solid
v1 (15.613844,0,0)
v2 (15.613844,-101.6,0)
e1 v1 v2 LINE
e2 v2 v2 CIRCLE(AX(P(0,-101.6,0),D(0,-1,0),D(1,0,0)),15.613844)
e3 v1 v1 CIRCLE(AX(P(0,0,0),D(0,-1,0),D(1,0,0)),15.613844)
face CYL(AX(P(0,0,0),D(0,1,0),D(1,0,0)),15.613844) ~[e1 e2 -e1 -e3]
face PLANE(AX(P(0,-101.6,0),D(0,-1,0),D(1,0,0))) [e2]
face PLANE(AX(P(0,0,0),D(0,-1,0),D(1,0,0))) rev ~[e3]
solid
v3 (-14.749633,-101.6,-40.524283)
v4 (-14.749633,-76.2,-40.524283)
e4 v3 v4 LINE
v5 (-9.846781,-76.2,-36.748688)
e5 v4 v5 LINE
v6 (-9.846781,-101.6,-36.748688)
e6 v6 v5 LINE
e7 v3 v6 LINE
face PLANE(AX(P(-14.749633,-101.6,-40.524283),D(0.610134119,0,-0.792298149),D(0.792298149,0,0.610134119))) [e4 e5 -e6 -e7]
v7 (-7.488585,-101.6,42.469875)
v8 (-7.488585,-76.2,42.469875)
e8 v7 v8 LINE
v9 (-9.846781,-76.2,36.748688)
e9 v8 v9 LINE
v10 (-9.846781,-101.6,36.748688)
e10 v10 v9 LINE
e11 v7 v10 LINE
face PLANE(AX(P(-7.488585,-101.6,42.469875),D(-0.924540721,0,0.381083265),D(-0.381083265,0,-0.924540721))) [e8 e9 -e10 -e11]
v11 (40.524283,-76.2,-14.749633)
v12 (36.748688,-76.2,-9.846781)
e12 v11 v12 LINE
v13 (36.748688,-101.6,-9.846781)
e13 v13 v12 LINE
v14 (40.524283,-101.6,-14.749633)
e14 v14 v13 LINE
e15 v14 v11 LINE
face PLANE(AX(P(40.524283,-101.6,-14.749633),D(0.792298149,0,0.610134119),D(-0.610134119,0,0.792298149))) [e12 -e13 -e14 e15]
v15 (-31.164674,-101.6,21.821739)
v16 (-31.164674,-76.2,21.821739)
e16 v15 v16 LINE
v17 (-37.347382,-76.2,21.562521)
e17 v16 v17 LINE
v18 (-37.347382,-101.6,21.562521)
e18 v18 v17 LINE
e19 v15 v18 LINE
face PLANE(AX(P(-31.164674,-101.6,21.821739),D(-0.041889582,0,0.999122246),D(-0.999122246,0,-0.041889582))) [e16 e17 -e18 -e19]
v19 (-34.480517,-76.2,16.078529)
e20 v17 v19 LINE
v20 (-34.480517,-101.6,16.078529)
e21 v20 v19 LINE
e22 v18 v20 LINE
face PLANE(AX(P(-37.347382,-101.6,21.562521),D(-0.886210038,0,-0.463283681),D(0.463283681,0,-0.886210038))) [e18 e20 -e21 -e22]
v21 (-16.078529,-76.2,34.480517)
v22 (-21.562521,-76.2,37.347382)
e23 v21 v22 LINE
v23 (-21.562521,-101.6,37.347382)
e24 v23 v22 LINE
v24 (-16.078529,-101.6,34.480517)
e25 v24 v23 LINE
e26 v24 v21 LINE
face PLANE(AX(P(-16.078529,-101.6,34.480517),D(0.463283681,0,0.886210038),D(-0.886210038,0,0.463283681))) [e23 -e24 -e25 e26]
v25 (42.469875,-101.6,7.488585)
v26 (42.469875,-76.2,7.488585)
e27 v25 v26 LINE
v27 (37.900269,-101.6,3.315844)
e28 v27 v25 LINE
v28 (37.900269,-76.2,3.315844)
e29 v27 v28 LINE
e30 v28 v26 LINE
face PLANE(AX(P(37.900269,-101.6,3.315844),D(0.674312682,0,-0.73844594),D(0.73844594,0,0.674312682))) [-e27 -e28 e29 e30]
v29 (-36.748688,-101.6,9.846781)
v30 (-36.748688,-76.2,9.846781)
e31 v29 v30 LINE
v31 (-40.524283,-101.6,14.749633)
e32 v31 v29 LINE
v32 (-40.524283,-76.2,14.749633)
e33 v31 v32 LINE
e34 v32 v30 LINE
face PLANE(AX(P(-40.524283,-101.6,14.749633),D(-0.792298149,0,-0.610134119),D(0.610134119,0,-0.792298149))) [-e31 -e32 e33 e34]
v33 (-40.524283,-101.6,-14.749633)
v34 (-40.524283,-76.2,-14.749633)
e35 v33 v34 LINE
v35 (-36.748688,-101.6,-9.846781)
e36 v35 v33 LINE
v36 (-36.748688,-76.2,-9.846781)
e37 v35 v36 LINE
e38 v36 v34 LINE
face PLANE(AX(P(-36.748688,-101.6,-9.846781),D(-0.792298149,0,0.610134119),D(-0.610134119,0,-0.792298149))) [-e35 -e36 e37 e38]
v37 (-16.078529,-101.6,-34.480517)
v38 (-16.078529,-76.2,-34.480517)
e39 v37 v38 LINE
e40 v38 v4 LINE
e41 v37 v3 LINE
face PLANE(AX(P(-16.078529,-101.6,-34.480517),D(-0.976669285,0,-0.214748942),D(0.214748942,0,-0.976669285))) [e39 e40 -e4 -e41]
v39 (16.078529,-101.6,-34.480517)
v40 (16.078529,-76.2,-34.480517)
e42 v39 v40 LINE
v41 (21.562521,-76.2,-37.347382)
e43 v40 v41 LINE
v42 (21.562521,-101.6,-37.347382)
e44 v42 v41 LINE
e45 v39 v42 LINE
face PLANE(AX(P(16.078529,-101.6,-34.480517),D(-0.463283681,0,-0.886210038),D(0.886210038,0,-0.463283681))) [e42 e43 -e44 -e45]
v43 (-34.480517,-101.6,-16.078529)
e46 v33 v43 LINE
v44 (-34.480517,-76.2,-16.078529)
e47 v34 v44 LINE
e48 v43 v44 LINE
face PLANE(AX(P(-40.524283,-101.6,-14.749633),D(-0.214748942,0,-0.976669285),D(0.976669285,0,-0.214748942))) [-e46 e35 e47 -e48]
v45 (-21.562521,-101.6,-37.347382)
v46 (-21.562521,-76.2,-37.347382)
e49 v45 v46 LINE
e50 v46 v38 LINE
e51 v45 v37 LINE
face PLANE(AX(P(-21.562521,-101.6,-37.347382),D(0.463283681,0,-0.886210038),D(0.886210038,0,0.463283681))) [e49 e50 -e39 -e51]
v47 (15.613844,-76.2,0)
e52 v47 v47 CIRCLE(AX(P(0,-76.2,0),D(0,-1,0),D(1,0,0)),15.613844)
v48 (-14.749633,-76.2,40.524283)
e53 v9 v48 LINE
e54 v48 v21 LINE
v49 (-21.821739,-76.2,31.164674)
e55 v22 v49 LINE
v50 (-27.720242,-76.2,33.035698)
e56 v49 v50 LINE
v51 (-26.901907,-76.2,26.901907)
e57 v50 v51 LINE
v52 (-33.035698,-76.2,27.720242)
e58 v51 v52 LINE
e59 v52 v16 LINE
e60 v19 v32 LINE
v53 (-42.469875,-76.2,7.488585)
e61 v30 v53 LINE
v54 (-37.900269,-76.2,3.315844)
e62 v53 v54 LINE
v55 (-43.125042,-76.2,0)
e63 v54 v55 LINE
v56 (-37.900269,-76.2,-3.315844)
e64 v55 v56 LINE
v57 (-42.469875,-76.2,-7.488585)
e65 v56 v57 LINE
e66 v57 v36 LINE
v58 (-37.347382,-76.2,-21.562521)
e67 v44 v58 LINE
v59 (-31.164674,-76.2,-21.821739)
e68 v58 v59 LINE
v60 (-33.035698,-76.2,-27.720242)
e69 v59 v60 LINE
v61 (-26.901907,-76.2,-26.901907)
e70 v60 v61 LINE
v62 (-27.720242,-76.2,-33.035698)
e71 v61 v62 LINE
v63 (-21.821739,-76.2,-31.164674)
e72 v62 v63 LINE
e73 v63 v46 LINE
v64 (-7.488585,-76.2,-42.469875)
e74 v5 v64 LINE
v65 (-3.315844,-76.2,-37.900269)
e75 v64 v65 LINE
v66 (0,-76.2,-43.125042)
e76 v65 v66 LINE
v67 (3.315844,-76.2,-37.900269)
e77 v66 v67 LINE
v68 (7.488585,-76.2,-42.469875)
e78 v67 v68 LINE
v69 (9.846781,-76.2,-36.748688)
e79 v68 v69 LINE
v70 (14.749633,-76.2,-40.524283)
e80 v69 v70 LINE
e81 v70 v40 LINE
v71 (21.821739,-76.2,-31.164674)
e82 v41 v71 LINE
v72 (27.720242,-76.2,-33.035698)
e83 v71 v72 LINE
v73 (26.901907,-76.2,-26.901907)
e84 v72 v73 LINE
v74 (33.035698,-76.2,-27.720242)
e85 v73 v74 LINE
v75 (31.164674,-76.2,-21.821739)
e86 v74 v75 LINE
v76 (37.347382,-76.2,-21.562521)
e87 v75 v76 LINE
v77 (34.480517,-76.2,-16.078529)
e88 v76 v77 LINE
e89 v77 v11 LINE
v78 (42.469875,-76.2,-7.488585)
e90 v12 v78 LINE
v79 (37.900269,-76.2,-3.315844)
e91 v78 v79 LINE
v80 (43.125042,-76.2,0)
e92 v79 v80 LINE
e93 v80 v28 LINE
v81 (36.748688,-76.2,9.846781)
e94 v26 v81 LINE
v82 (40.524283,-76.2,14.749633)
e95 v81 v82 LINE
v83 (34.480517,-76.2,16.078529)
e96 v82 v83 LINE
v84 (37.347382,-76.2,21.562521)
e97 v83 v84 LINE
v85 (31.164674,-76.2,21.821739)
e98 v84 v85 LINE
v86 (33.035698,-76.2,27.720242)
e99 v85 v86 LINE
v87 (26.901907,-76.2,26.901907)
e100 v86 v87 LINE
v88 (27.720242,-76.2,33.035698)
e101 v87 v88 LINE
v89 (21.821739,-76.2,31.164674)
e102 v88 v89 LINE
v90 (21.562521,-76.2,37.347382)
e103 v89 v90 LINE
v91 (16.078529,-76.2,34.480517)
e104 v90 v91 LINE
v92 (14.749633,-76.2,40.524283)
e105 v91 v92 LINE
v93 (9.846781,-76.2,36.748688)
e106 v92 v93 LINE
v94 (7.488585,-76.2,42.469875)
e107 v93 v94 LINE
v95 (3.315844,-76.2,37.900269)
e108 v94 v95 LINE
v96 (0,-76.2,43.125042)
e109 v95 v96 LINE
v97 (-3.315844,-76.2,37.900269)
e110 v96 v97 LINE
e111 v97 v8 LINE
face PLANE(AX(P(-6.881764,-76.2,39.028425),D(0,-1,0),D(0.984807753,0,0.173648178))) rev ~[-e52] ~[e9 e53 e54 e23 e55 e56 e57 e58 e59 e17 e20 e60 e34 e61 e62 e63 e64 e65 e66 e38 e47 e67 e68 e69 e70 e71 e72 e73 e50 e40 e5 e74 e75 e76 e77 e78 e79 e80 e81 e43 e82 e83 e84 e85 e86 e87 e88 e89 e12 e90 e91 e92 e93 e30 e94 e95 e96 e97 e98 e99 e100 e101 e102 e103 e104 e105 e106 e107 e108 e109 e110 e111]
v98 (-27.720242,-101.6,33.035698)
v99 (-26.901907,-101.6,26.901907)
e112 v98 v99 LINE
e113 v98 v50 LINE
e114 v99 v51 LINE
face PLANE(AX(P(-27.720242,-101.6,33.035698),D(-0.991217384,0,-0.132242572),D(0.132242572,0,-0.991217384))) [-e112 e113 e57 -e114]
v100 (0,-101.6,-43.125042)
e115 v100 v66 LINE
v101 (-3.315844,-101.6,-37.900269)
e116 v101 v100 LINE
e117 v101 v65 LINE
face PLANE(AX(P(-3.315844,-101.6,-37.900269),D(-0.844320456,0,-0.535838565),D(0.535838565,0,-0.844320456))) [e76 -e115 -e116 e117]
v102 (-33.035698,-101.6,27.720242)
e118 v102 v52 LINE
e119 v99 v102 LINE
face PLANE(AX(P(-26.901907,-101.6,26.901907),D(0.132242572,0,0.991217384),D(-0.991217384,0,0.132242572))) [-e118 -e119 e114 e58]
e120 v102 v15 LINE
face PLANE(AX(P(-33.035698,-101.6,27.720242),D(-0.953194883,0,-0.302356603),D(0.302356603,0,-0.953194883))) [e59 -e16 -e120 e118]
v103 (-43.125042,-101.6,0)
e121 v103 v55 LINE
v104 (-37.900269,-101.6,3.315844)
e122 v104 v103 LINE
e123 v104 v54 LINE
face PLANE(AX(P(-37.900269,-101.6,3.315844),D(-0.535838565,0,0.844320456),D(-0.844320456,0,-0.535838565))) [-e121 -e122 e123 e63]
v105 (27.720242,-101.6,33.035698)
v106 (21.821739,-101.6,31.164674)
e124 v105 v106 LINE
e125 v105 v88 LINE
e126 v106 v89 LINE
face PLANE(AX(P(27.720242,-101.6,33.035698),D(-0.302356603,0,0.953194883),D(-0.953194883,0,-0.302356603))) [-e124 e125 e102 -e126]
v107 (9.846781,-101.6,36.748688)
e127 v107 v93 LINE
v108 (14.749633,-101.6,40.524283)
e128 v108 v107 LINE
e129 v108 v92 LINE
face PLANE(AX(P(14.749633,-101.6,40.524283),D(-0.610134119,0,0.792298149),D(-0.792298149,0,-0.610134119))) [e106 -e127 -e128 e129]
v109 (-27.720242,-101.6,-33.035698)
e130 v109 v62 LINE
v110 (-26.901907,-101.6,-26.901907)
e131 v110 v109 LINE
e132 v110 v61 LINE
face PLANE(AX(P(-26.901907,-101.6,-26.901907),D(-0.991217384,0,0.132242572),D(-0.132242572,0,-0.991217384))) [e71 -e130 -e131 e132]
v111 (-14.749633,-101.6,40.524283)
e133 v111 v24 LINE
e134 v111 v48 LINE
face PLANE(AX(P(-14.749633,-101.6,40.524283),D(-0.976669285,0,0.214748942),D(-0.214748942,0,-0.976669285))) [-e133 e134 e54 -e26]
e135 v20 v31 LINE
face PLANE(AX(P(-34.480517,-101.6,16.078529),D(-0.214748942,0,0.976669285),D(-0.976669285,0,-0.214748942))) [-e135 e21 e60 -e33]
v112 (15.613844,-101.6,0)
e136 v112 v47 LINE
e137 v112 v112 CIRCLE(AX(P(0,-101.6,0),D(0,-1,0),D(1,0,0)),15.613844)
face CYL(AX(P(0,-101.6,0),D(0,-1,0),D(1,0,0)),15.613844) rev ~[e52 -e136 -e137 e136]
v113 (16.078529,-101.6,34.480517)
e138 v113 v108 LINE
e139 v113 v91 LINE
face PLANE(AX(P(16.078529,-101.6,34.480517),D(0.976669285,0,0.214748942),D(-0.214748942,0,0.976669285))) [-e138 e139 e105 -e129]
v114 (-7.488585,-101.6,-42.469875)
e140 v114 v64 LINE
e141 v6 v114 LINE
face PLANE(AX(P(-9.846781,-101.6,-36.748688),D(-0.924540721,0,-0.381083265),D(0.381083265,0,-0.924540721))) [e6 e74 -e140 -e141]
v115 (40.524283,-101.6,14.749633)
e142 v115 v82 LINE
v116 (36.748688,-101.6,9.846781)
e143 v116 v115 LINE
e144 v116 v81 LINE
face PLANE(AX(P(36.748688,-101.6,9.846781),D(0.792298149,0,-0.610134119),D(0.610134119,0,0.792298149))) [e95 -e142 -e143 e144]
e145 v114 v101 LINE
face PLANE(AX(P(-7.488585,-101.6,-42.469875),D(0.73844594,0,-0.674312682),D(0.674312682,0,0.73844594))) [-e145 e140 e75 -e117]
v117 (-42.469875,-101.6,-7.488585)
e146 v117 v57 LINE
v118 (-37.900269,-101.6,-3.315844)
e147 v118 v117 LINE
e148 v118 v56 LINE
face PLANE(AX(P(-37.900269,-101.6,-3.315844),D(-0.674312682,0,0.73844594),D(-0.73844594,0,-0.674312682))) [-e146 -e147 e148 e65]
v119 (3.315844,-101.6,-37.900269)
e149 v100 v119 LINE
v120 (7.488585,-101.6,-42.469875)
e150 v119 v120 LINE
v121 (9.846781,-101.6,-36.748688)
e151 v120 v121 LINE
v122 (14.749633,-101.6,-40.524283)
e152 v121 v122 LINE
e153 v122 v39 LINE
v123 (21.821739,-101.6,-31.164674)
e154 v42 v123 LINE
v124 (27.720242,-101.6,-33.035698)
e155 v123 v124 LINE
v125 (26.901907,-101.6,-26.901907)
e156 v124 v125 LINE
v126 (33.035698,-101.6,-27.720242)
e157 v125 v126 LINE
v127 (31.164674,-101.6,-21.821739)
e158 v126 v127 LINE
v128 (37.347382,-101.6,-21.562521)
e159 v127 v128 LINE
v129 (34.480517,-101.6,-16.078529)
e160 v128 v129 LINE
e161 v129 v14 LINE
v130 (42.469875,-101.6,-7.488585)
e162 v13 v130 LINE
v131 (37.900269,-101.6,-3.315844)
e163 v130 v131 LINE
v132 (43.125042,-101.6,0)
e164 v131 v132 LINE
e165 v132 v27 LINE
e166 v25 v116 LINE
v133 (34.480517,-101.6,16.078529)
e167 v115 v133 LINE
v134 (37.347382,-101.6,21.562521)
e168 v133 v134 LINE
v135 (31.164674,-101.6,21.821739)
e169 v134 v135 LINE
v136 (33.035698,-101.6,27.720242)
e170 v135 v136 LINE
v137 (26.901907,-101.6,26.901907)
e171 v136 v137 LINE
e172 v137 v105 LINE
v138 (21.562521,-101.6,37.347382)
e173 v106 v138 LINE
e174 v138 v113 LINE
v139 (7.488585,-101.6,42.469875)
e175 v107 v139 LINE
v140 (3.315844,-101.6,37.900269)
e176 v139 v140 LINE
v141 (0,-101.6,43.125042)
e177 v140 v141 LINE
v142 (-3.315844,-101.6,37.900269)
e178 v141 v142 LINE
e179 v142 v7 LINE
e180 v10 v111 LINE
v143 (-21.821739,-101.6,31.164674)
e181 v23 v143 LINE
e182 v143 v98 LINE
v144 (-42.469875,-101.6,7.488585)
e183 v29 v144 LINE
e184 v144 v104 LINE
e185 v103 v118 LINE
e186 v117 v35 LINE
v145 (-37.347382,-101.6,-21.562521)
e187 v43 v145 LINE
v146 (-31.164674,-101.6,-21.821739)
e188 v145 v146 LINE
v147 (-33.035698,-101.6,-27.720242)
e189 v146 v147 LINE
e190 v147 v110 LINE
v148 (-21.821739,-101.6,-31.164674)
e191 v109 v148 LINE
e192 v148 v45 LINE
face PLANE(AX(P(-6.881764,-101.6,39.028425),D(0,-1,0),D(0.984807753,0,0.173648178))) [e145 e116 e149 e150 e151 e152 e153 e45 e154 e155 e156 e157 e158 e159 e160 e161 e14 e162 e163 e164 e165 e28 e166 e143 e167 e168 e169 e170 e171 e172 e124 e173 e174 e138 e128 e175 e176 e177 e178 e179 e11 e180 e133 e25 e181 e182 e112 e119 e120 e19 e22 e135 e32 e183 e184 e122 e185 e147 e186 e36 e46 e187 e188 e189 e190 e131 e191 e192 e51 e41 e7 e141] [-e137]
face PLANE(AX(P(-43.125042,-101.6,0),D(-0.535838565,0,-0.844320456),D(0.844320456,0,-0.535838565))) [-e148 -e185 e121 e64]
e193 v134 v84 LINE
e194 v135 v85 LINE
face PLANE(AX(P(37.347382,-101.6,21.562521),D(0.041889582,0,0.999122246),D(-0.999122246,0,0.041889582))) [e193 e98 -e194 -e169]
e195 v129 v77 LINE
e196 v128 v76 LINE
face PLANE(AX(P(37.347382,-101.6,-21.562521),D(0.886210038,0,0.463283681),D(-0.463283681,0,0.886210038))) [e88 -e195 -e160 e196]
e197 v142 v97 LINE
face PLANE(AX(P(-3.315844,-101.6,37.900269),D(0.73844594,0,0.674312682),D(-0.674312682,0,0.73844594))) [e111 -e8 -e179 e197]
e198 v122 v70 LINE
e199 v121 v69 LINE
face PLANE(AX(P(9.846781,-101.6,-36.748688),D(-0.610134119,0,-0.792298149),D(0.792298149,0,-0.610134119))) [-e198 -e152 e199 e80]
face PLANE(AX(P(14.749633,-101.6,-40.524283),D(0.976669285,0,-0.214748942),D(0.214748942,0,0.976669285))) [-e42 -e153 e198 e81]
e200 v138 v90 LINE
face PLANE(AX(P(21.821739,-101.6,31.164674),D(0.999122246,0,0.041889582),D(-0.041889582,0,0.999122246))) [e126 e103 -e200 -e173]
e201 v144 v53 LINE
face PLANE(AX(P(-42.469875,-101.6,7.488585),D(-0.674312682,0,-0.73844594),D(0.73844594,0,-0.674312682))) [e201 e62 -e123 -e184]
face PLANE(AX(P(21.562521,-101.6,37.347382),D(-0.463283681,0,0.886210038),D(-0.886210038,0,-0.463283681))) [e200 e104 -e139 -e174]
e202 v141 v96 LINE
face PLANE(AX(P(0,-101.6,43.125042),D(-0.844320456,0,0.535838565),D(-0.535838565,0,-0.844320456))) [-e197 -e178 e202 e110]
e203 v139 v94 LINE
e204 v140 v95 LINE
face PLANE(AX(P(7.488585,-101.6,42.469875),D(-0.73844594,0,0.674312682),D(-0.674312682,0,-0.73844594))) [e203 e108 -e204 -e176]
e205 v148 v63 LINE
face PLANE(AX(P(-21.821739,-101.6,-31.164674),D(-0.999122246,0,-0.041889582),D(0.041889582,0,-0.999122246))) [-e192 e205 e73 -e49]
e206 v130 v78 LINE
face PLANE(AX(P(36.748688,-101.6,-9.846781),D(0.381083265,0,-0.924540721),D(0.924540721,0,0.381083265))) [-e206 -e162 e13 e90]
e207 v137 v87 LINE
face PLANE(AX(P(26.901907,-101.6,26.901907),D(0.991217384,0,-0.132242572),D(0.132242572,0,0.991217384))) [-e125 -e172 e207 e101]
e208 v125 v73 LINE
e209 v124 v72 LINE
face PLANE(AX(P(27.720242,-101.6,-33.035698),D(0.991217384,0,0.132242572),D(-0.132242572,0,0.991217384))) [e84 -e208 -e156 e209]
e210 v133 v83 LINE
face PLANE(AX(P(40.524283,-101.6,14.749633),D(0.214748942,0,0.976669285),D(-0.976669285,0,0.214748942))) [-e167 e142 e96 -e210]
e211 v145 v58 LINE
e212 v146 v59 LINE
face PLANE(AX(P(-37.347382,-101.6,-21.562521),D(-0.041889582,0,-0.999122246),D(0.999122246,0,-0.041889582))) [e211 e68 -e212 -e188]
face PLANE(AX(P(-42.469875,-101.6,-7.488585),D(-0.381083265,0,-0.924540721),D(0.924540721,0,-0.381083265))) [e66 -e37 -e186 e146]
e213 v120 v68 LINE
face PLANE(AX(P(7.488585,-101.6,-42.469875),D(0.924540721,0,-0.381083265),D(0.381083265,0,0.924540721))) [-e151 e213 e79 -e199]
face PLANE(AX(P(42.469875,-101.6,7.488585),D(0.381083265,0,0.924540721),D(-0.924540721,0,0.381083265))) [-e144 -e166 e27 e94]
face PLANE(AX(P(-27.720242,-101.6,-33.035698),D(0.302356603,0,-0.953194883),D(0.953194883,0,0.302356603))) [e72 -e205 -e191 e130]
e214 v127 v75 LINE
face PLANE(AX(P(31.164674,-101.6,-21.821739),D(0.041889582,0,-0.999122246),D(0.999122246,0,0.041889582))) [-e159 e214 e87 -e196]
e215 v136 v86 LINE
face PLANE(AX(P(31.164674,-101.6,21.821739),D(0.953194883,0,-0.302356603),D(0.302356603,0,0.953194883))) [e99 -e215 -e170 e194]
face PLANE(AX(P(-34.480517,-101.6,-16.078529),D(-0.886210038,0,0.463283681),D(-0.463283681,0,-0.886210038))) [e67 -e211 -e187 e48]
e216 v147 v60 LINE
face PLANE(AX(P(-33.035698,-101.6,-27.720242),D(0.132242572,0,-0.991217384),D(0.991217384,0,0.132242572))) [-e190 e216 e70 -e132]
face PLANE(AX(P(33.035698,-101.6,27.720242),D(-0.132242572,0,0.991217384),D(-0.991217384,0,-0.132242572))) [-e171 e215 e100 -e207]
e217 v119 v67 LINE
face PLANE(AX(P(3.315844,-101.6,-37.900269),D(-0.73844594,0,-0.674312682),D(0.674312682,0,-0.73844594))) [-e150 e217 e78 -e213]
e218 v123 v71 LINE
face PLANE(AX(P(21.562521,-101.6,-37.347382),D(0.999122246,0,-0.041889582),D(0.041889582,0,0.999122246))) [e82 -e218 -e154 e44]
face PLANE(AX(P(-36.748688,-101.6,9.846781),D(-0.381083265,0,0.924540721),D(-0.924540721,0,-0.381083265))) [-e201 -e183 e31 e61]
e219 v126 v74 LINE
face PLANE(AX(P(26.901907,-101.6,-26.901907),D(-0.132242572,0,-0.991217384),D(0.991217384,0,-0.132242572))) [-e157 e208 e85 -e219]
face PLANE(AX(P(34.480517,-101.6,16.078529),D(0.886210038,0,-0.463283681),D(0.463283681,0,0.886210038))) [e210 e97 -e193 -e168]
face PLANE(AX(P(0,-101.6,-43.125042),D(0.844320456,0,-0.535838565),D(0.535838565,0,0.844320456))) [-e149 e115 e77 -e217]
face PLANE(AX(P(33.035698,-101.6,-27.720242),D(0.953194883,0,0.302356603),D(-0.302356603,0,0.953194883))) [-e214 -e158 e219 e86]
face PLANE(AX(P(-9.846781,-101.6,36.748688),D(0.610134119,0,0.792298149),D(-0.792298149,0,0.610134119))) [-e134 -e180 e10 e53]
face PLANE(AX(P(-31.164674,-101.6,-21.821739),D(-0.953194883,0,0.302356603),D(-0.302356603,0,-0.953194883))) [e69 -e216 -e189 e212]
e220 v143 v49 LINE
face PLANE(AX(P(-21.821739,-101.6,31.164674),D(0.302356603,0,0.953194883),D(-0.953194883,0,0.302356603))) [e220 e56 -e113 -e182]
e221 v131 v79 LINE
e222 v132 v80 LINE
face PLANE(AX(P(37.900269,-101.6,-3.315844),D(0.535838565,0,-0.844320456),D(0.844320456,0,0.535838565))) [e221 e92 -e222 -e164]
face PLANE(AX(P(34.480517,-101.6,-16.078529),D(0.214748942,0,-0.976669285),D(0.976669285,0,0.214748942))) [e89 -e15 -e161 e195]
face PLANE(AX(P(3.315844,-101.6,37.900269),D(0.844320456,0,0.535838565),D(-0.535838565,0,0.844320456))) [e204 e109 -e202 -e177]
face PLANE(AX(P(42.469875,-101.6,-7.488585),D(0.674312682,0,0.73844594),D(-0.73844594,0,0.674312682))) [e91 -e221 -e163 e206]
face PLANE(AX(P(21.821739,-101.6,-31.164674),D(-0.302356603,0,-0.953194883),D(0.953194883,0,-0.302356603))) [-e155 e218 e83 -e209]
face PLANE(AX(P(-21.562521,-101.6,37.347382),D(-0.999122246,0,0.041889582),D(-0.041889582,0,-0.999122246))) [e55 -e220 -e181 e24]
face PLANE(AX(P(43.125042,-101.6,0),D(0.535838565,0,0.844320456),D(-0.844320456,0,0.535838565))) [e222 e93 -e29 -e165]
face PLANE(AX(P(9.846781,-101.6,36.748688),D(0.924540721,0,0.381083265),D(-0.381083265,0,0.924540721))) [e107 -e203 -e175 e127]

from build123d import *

# Parameters (mm, degrees)
F0_R            = 15.6138441185
F1_DEPTH        = 101.6
F2_R            = 38.0450416099
F2_R_2          = 15.6138441185
F3_DEPTH        = 25.4
F5_DEPTH        = 25.4
F5_COPIES_COUNT = 36


# Not quite as in the source:
# - a pattern or mirror of a feature is missing from the dataset's text; its kind, count and spacing are read off the source's solid


with BuildPart() as f1:
    # F0 (on Front) → F1 (new body)
    with BuildSketch(Plane.XZ):
        Circle(F0_R)
    extrude(amount=F1_DEPTH)


with BuildPart() as f3:
    # F2 (on face) → F3 (new body)
    with BuildSketch(Plane.XZ.offset(101.6)):
        Circle(F2_R)
        Circle(F2_R_2, mode=Mode.SUBTRACT)
    extrude(amount=-F3_DEPTH)

    # F4 (on face) → F5 (join, through all)
    with BuildSketch(Plane.XZ.offset(101.6)):
        with BuildLine():
            Line((0, 43.1250416099), (-3.3158438594, 37.9002687404))
            ThreePointArc((-3.3158438594, 37.9002687404), (0, 38.0450416099), (3.3158438594, 37.9002687404))
            Line((3.3158438594, 37.9002687404), (0, 43.1250416099))
        make_face()
    f5 = extrude(amount=-F5_DEPTH)

    # F5_copies: F5 ×36 about axis
    f5_copies_axis = Axis((0, 0, 0), (0, 1, 0))
    for i in range(1, F5_COPIES_COUNT):
        add(f5.rotate(f5_copies_axis, i * 360 / F5_COPIES_COUNT))


solid = Compound([f1.part, f3.part])
